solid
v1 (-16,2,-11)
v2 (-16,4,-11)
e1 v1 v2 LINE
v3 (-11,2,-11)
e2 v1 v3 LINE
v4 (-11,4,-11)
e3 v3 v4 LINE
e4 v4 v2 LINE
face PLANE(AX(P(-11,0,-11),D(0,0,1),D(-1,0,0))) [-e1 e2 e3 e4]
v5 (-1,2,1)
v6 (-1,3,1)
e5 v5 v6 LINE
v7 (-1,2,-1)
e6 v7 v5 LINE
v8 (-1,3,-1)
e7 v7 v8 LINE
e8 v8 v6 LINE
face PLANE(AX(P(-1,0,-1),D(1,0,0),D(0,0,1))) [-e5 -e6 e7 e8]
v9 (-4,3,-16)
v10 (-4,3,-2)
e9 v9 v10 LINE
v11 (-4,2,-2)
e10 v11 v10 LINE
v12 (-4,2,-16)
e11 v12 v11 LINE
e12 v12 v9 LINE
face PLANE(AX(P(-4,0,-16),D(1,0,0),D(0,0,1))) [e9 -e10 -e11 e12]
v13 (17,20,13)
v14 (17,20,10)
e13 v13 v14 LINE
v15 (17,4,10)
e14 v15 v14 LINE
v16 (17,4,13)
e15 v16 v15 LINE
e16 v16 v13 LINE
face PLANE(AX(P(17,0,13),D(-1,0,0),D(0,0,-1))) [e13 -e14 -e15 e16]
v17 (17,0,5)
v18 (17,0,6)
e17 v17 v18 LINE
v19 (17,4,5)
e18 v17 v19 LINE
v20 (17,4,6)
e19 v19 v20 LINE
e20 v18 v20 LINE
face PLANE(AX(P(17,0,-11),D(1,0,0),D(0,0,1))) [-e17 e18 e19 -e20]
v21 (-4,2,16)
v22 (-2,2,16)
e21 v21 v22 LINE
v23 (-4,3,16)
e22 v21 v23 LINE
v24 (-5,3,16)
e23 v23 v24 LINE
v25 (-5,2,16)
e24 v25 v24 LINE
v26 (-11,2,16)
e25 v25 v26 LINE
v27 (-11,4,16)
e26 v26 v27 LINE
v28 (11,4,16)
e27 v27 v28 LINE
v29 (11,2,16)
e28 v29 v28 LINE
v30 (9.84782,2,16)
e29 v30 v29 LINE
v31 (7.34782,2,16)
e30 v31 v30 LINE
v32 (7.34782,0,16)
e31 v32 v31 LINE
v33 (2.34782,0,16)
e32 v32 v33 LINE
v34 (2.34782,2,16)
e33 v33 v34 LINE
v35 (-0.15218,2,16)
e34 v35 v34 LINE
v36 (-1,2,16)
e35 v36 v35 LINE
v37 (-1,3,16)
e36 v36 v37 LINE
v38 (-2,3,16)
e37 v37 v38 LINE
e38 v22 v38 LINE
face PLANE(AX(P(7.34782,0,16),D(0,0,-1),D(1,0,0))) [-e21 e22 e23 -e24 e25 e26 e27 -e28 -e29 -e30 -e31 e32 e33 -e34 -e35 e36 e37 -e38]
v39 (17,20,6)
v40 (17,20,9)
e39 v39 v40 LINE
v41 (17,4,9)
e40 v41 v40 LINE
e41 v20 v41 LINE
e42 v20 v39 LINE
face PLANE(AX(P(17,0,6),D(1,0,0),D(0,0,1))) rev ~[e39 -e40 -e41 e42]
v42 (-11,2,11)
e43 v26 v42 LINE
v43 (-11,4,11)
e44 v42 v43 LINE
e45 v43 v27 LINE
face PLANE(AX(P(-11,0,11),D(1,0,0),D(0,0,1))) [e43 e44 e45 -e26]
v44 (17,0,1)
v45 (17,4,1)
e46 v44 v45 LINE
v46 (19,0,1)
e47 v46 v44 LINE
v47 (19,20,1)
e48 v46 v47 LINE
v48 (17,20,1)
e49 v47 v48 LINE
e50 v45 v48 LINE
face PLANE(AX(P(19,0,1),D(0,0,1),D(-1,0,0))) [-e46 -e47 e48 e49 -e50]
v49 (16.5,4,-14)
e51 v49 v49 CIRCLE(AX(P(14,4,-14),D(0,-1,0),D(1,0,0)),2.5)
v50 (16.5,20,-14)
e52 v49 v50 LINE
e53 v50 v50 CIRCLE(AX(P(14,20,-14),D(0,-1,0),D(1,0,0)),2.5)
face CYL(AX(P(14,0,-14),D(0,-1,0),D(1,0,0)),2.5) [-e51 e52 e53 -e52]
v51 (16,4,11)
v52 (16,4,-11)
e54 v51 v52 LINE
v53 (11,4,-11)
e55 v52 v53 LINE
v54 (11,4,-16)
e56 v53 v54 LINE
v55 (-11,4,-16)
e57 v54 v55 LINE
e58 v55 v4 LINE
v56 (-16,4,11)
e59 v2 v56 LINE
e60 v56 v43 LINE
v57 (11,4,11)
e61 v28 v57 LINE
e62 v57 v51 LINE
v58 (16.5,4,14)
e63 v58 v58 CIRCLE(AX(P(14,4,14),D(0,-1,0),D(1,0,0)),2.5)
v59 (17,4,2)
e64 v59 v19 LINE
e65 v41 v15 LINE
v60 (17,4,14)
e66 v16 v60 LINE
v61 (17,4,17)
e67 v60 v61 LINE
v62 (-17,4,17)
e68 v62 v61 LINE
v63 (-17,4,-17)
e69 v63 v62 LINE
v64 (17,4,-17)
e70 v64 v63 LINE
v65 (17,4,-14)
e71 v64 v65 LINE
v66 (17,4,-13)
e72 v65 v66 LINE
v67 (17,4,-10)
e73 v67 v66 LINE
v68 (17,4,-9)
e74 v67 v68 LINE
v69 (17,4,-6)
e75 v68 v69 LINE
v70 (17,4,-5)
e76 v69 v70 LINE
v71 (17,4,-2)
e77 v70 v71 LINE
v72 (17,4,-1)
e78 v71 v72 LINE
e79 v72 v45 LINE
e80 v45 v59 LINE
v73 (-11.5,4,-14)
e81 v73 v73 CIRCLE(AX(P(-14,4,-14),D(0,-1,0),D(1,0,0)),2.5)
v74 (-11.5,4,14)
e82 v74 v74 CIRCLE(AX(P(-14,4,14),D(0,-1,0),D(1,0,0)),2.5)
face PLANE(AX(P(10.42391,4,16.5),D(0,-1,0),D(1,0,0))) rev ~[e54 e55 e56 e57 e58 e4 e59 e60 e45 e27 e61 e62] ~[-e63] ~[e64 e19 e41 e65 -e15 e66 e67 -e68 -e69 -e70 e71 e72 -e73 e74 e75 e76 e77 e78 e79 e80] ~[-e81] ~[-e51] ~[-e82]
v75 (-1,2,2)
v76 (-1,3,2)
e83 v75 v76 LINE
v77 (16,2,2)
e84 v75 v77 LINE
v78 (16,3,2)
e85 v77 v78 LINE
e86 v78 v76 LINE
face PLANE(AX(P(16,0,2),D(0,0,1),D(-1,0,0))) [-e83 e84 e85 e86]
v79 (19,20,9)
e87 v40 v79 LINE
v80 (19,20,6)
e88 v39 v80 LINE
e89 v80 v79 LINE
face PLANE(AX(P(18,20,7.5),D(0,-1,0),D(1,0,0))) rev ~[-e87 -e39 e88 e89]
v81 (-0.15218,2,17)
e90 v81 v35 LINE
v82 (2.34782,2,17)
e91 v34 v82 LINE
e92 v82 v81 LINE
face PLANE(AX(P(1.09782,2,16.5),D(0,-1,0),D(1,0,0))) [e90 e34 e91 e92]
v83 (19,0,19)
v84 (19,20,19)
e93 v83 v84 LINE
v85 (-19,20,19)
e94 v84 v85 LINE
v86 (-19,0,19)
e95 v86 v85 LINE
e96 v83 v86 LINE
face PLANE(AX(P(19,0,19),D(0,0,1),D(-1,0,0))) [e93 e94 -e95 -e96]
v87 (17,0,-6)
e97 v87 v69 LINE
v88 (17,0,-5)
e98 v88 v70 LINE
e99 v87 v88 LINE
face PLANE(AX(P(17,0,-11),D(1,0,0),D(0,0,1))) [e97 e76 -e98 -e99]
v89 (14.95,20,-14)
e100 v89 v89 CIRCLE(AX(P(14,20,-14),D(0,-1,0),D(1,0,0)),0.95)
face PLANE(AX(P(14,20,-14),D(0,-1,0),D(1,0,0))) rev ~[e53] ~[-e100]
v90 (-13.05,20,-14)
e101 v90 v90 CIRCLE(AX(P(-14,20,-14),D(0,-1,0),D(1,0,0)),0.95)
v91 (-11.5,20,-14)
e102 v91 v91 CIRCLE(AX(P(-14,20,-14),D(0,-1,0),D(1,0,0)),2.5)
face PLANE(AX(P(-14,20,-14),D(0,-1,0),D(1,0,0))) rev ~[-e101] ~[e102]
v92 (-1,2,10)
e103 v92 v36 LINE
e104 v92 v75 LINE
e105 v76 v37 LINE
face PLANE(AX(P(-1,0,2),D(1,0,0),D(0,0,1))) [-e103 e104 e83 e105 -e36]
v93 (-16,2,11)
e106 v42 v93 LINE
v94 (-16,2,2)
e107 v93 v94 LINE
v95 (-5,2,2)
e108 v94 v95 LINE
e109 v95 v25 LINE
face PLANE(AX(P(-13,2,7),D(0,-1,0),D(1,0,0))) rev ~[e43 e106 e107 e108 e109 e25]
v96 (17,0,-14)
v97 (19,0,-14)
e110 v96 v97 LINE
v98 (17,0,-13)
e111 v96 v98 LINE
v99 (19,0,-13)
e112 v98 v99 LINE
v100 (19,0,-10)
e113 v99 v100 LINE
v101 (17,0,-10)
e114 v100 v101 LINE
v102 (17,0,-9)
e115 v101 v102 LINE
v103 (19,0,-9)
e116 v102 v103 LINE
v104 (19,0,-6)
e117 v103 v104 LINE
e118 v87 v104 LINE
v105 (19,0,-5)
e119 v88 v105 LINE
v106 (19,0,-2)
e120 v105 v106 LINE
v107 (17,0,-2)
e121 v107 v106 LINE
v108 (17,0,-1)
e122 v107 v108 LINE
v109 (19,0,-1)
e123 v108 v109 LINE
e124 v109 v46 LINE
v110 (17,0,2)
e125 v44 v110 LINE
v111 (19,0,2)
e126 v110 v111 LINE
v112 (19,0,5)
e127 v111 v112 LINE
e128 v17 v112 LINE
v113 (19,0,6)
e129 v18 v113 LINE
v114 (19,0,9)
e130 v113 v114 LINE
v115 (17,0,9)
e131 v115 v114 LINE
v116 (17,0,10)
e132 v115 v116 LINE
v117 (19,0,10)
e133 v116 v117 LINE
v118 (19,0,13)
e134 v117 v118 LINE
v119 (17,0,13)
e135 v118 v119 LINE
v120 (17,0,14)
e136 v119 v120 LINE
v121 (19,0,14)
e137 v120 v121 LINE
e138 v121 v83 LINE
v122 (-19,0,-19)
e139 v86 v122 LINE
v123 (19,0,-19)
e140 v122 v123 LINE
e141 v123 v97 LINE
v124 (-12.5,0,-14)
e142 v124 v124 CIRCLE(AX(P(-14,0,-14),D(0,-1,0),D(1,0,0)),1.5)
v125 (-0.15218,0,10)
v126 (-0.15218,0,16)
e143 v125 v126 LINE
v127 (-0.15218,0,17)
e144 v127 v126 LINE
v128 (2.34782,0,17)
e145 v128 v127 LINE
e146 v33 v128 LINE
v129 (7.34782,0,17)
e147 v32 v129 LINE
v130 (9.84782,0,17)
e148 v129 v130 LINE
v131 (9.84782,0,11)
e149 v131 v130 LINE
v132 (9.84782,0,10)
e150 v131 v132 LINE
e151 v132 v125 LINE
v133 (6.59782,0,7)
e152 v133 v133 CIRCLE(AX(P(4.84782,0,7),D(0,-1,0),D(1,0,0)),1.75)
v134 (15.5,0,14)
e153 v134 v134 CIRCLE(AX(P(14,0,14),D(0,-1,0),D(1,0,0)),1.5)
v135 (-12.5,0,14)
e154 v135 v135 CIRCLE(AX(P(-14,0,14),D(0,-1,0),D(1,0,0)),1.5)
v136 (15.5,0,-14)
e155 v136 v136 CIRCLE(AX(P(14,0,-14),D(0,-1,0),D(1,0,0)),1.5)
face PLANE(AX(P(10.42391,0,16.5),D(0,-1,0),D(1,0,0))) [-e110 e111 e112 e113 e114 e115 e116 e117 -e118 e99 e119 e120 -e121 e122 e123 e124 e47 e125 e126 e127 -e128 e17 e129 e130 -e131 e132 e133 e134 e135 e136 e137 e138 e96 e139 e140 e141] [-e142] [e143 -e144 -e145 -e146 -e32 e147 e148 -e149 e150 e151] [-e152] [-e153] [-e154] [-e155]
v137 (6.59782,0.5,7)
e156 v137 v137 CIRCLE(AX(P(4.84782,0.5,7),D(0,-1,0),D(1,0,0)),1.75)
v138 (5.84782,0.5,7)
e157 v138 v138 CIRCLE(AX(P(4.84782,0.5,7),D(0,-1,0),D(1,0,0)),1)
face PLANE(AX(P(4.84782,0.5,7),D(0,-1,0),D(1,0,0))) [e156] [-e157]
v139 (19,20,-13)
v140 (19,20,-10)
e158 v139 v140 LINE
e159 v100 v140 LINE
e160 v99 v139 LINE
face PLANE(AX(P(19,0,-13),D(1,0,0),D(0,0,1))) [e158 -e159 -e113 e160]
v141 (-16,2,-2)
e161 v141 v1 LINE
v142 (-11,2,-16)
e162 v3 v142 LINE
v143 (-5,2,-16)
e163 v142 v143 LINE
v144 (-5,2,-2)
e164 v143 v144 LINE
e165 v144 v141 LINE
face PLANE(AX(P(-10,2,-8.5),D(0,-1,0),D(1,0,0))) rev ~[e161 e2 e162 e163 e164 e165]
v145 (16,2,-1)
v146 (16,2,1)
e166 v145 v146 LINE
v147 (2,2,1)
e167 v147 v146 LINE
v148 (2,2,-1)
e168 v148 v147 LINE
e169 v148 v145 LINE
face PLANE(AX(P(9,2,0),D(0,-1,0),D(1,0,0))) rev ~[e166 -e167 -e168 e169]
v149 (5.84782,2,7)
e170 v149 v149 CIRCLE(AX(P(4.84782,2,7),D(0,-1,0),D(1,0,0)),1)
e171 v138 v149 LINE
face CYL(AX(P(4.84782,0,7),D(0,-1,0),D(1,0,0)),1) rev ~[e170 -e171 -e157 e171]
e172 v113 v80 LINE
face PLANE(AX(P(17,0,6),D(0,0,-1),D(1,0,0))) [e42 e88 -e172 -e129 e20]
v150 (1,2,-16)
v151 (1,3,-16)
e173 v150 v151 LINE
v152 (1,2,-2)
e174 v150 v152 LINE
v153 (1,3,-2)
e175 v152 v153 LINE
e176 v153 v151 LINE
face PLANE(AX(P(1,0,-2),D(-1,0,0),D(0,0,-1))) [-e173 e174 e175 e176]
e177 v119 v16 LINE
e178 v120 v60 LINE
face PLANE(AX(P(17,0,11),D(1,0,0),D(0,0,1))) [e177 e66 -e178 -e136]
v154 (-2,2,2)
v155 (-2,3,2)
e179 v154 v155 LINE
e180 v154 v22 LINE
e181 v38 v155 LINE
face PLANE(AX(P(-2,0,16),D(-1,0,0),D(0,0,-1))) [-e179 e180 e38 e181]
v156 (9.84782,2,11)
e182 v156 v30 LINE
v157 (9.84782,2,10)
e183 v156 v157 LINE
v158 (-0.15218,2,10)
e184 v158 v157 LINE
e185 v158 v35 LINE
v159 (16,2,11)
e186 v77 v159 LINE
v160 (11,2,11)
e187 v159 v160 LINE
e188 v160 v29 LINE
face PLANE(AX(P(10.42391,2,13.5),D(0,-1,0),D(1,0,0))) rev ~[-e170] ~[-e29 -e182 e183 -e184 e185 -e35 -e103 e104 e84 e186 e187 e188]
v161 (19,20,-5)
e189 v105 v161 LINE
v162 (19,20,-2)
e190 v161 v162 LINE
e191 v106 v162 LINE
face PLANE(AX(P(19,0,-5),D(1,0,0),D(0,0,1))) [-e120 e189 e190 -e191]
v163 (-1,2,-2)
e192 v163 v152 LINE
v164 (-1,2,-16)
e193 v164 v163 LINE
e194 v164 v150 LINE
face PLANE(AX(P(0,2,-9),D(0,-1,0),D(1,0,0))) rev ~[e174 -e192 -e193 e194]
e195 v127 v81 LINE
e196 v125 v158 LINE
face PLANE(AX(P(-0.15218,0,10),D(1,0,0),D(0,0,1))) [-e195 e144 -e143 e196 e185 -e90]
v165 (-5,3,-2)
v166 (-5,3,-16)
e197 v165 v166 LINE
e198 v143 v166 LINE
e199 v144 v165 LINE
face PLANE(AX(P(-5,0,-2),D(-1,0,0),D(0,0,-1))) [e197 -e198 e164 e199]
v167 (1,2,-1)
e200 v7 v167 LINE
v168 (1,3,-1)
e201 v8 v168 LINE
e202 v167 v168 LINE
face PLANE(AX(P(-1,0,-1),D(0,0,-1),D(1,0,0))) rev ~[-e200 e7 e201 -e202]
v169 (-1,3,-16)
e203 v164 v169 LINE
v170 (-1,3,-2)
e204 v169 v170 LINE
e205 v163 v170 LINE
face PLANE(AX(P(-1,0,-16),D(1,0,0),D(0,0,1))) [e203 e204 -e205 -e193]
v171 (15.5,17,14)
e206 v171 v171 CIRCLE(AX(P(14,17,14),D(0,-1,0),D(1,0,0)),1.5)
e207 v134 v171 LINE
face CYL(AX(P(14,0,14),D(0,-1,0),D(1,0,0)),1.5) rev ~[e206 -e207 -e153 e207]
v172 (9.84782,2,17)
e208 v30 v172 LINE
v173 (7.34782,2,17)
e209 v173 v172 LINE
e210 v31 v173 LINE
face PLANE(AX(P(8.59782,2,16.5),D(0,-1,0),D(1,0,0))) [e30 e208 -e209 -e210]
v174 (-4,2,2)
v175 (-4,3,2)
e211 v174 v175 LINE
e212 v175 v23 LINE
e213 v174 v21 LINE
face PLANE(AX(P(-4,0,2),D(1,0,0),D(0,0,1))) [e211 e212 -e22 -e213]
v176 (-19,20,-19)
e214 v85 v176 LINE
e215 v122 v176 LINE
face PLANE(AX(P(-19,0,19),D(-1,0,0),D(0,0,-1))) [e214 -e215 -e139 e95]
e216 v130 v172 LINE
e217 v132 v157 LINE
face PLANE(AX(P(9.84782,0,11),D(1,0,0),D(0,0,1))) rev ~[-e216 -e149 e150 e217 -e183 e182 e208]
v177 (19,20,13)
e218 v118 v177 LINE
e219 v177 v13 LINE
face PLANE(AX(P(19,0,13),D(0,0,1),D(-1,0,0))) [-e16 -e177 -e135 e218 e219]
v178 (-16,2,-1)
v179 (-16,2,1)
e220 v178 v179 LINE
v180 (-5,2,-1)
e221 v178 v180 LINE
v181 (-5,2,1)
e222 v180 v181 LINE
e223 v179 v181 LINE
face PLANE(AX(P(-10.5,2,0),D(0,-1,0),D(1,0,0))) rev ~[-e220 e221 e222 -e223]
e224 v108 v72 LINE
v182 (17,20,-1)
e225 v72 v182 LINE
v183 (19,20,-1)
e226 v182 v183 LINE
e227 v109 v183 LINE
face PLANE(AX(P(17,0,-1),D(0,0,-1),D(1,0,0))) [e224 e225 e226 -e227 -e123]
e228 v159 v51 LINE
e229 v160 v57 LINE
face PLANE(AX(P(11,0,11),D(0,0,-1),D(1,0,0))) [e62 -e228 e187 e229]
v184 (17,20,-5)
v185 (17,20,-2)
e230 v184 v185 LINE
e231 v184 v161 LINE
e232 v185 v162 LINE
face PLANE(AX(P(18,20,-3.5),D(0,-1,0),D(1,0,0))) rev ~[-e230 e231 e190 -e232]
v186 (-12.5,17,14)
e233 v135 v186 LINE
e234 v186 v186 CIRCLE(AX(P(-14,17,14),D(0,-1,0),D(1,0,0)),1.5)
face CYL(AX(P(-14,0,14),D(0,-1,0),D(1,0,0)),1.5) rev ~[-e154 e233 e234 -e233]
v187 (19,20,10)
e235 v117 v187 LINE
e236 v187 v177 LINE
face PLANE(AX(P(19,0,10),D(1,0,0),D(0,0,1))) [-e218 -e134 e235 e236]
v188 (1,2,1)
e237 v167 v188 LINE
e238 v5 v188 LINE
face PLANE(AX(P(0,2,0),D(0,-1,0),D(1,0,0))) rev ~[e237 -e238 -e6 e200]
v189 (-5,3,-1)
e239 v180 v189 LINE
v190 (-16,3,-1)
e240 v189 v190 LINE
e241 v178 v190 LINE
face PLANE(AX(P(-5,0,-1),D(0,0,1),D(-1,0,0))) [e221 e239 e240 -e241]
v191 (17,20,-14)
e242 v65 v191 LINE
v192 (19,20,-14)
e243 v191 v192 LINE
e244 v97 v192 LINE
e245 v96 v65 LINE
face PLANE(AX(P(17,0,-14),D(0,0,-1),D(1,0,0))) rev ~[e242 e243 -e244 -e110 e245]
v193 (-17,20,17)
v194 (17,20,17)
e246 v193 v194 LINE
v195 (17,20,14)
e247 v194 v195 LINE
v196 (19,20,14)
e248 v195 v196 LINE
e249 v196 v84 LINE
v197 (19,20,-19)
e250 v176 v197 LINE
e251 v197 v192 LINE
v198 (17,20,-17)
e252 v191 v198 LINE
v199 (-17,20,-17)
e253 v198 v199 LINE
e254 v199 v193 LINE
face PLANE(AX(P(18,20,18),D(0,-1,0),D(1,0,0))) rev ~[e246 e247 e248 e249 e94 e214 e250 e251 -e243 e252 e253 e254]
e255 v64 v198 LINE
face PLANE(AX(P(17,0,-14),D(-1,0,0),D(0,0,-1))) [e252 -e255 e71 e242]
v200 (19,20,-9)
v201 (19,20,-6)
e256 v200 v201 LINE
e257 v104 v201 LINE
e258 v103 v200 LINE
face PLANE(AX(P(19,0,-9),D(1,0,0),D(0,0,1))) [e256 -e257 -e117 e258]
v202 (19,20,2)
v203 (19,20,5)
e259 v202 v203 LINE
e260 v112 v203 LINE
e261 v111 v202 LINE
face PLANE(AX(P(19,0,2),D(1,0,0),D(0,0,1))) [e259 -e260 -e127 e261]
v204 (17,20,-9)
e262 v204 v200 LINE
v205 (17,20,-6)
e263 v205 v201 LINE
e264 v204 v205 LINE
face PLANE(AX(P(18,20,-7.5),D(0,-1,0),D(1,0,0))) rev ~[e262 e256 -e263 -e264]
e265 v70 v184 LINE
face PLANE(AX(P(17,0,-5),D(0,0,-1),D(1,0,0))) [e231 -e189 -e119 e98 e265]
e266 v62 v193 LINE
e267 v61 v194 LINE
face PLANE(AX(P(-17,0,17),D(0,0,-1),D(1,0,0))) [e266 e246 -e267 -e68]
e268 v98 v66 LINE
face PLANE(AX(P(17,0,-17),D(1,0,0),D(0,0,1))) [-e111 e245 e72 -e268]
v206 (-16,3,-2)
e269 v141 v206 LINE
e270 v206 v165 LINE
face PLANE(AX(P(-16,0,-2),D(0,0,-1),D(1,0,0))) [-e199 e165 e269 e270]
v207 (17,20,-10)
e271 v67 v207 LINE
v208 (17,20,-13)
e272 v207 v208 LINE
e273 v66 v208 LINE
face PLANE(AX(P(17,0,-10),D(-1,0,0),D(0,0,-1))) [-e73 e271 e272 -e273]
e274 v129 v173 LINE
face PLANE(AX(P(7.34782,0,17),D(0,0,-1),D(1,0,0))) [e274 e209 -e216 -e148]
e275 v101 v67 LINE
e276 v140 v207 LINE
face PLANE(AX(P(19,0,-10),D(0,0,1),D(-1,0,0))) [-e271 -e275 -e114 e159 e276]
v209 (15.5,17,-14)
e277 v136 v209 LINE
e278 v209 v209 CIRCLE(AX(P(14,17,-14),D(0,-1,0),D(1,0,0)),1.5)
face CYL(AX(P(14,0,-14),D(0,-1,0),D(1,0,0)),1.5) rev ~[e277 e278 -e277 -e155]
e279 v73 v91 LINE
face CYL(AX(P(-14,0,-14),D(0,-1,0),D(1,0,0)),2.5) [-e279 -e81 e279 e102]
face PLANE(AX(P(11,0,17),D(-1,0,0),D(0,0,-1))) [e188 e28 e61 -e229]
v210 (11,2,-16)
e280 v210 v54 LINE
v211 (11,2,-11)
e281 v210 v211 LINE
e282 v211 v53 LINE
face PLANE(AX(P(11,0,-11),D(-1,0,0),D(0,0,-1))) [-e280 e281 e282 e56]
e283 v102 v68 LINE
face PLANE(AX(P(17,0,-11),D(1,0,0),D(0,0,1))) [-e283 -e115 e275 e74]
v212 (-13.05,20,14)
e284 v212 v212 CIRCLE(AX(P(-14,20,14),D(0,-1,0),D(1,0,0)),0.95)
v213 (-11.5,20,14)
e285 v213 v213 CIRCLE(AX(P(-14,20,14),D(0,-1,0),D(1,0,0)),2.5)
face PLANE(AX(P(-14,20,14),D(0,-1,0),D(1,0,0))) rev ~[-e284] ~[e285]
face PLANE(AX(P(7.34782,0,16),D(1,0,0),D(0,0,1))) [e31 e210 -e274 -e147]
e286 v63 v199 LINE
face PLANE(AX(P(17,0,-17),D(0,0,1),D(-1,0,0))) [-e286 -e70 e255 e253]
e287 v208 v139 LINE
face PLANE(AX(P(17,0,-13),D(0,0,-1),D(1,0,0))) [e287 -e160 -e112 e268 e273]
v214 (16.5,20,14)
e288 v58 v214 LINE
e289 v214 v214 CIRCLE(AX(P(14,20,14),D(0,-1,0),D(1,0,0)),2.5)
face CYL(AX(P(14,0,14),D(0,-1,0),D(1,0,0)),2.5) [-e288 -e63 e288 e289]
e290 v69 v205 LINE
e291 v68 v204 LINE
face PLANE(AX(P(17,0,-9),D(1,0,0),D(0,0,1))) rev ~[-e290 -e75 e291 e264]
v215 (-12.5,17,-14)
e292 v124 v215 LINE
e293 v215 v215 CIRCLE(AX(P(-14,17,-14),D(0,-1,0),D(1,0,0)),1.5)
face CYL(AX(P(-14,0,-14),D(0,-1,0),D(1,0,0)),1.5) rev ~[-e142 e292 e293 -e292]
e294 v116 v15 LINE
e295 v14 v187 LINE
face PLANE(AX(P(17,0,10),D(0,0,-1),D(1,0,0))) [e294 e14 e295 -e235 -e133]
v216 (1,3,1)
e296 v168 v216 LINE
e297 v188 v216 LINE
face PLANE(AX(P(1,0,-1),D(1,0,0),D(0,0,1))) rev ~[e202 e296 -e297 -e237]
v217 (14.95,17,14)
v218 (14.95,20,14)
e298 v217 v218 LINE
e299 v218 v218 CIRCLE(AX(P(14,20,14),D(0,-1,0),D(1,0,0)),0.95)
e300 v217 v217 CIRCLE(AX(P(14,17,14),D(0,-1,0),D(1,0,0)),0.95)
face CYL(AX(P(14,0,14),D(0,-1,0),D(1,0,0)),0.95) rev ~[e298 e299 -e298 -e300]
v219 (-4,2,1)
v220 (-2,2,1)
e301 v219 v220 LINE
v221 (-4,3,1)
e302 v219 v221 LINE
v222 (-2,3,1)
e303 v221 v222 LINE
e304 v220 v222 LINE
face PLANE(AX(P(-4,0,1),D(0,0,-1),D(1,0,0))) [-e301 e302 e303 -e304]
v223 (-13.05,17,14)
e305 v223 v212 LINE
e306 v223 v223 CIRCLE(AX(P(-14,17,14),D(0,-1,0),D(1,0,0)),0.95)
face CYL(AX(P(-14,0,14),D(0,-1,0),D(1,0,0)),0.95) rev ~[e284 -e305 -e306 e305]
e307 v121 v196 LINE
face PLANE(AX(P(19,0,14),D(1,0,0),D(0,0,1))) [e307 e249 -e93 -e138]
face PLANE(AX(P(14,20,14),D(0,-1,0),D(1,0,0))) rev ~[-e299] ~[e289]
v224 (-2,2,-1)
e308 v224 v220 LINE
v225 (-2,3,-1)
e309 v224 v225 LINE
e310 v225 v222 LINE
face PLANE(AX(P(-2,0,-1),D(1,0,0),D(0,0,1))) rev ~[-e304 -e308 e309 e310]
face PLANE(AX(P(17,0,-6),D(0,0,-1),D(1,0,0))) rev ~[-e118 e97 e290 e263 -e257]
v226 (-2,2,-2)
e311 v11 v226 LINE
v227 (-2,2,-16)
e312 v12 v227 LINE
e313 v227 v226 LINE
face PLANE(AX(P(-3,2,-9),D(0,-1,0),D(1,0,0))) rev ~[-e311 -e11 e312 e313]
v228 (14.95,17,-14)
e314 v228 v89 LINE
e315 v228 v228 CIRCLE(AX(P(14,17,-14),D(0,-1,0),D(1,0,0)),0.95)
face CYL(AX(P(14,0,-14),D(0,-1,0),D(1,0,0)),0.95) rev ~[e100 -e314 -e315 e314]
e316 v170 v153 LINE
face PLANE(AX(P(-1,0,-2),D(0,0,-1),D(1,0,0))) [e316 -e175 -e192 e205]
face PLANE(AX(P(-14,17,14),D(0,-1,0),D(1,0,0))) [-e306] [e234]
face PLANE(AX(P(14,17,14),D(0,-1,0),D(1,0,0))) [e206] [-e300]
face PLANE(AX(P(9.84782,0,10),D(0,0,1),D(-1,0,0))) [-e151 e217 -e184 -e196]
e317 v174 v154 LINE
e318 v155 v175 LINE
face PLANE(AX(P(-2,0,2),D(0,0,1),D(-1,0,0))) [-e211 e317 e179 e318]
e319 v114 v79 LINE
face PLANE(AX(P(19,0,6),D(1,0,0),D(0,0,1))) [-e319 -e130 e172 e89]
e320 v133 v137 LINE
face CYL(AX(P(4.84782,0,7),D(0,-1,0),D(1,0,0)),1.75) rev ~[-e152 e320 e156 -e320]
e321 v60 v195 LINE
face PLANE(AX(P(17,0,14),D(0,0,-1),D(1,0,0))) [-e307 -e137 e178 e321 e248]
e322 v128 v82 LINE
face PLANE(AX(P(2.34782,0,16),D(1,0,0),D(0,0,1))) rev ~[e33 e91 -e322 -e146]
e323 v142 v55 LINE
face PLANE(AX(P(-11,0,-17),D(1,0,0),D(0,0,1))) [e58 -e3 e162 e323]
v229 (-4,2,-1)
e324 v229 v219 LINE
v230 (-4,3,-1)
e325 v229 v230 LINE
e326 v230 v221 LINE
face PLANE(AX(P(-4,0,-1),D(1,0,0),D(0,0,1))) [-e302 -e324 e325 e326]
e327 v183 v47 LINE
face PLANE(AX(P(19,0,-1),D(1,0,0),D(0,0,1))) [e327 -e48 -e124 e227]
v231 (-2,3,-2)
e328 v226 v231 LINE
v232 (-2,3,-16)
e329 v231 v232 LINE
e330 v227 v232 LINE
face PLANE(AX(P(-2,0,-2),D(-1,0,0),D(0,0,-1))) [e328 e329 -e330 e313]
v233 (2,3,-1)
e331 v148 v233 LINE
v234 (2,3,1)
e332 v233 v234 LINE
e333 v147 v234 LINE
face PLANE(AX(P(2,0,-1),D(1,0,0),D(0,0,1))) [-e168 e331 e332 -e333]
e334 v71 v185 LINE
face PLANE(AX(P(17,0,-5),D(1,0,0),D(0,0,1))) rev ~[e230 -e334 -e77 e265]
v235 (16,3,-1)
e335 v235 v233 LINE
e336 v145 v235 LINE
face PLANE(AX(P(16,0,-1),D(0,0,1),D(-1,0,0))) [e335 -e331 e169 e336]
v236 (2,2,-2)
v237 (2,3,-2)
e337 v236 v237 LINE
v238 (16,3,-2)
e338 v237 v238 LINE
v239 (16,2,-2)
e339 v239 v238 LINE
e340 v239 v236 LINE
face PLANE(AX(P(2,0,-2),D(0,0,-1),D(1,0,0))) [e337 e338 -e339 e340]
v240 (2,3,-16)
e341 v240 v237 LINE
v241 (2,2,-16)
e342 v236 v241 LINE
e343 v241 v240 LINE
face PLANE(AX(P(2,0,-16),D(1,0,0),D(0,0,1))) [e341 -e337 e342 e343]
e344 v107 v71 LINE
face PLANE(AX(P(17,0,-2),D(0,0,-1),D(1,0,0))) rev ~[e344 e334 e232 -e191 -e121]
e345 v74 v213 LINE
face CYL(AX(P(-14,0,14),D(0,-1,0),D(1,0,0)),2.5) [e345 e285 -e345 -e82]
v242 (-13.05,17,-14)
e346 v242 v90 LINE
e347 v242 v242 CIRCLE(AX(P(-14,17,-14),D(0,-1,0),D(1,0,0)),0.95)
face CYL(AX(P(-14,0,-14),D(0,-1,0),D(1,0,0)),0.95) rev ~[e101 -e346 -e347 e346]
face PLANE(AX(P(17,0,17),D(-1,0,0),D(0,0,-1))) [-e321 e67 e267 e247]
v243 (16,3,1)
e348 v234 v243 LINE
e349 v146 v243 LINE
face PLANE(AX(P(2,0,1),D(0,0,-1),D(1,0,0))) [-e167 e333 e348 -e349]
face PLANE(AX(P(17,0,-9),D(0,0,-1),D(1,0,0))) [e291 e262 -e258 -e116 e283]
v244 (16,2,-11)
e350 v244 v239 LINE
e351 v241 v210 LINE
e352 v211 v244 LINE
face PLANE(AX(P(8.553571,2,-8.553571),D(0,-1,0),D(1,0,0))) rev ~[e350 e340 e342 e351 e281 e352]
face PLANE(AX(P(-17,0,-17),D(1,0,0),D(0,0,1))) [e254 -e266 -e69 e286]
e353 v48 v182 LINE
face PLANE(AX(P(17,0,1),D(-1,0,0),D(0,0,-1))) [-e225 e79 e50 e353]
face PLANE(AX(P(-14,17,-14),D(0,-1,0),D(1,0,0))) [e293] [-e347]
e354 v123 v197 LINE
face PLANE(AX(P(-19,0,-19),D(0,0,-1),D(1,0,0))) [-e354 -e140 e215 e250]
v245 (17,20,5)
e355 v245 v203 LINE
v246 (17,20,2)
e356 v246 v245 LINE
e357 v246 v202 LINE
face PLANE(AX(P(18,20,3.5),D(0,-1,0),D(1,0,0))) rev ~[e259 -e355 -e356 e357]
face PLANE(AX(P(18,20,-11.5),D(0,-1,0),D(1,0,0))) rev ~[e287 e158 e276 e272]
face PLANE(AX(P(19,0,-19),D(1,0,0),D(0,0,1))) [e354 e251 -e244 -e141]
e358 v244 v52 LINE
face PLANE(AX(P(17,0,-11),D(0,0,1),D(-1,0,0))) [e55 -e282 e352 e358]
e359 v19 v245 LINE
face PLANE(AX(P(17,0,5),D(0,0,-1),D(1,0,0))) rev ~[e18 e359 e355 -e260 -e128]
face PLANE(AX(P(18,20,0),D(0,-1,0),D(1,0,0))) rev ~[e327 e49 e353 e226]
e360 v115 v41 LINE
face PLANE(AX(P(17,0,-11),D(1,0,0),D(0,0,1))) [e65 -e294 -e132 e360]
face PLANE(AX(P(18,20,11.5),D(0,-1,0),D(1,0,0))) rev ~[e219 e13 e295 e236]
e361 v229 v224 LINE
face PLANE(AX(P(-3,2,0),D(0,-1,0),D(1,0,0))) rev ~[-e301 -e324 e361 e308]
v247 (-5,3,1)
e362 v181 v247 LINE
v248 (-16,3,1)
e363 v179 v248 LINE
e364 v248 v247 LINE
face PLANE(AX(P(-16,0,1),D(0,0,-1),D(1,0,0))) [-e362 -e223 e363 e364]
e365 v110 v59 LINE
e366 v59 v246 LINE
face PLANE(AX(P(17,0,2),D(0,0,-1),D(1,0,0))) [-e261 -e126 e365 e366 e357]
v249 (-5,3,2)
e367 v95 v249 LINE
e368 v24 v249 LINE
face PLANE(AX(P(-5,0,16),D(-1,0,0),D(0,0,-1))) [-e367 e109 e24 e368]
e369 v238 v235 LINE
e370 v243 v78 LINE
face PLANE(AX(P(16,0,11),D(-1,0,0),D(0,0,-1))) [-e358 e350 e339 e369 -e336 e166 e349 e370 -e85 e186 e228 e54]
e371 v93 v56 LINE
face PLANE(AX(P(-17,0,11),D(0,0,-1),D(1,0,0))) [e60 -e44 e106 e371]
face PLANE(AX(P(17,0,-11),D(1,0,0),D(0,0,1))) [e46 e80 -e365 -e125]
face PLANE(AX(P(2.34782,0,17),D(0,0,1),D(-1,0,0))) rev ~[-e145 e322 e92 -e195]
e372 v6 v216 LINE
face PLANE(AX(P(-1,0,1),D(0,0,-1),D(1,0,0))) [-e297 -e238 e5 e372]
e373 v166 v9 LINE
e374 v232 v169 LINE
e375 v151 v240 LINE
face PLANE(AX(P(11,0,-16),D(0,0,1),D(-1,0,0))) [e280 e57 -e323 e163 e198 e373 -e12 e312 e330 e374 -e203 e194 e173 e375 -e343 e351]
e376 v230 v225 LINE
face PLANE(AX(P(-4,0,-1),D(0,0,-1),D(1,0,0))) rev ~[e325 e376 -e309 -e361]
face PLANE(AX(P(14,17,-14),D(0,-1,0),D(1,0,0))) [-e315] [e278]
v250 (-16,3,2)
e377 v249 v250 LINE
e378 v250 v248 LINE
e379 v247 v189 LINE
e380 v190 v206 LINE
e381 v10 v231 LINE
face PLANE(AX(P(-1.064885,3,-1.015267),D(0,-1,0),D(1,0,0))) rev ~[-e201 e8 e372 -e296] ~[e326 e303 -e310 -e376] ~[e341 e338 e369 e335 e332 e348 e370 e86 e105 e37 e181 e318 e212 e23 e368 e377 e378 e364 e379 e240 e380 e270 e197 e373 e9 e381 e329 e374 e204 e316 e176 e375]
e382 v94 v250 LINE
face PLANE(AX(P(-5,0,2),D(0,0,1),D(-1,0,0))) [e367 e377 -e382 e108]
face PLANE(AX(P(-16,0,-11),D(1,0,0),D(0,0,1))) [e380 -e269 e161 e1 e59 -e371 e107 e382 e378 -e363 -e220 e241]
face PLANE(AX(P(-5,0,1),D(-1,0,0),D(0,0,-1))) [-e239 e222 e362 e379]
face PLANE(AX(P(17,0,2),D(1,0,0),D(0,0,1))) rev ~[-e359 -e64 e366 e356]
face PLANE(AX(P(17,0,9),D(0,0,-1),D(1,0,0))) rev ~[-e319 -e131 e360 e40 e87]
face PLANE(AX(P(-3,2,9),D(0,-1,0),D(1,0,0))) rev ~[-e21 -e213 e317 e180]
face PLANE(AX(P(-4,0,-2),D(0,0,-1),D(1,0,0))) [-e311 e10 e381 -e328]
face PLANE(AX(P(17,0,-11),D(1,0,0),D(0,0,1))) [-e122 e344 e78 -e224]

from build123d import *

# Parameters (mm, degrees)
F0_W      = 2
F0_H      = 2
F1_DEPTH  = 3
F0_H_2    = 14
F0_W_2    = 14
F0_W_3    = 11
F2_DEPTH  = 2
F0_R      = 2.5
F3_DEPTH  = 4
F0_R_2    = 1.5
F0_R_3    = 0.95
F4_DEPTH  = 20
F5_DEPTH  = 17
F6_DEPTH  = 17
F7_DEPTH  = 17
F8_DEPTH  = 17
F0_W_4    = 6
F0_H_3    = 6
F9_DEPTH  = 2
F0_H_4    = 3
F10_DEPTH = 20
F0_W_5    = 3
F0_W_6    = 5
F0_W_7    = 1.1521804929
F0_H_5    = 5
F0_R_4    = 1.75
F0_R_5    = 1
F0_W_8    = 0.8478195071
F11_DEPTH = 2
F0_H_6    = 1
F12_DEPTH = 4
F0_W_9    = 2.5
F13_DEPTH = 4
F14_DEPTH = 2
F15_DEPTH = 2
F16_DEPTH = 0.5


# Not quite as in the source:
# - a feature names something its author has since deleted; it is built from what else it names


with BuildPart() as f1:
    # F0 (on Front) → F1 (new body)
    with BuildSketch(Plane.XZ):
        Polygon((16, 1), (16, 2), (2, 2), (1, 2), (-1, 2), (-1, 10), (-1, 16), (-2, 16), (-2, 2), (-4, 2), (-4, 16), (-5, 16), (-5, 2), (-16, 2), (-16, 1), (-5, 1), (-5, -1), (-16, -1), (-16, -2), (-5, -2), (-5, -16), (-4, -16), (-4, -2), (-2, -2), (-2, -16), (-1, -16), (-1, -2), (1, -2), (1, -16), (2, -16), (2, -2), (16, -2), (16, -1), (2, -1), (2, 1), align=None)
        with Locations((-3, 0)):
            Rectangle(F0_W, F0_H, mode=Mode.SUBTRACT)
        Rectangle(F0_W, F0_H, mode=Mode.SUBTRACT)
    extrude(amount=-F1_DEPTH)

    # F0 (on Front) → F2 (join)
    with BuildSketch(Plane.XZ):
        Polygon((16, 2), (16, 10.1685791543), (16, 11), (11, 11), (9.8478195071, 11), (9.8478195071, 10.2023985237), (9.8478195071, 10), (7.6956390142, 10), (7.6956390142, 7.9433578615), (7.6956390142, 6.0566421385), (7.6956390142, 4), (4.8478195071, 4), (2, 4), (2, 6.0566421385), (2, 7.9433578615), (2, 10), (-0.1521804929, 10), (-1, 10), (-1, 2), (1, 2), (2, 2), align=None)
        with Locations((-3, 9)):
            Rectangle(F0_W, F0_H_2)
        Polygon((16, -11), (16, -2), (2, -2), (2, -16), (11, -16), (11, -11), align=None)
        with Locations((9, 0)):
            Rectangle(F0_W_2, F0_H)
        with Locations((-10.5, 0)):
            Rectangle(F0_W_3, F0_H)
        Polygon((-11, -11), (-11, -16), (-5, -16), (-5, -2), (-16, -2), (-16, -11), align=None)
        with Locations((-3, -9)):
            Rectangle(F0_W, F0_H_2)
        with Locations((0, -9)):
            Rectangle(F0_W, F0_H_2)
        Polygon((-5, 2), (-5, 16), (-11, 16), (-11, 11), (-16, 11), (-16, 10), (-10, 10), (-10, 4), (-16, 4), (-16, 2), align=None)
        with Locations((-3, 0)):
            Rectangle(F0_W, F0_H)
        Rectangle(F0_W, F0_H)
    extrude(amount=-F2_DEPTH)

    # F0 (on Front) → F3 (join)
    with BuildSketch(Plane.XZ):
        Polygon((11, 11), (16, 11), (17, 11), (17, 13), (17, 14), (17, 17), (14, 17), (11, 17), (11, 16), align=None)
        with Locations((14, 14)):
            Circle(F0_R, mode=Mode.SUBTRACT)
        Polygon((-11, 16), (-11, 17), (-14, 17), (-17, 17), (-17, 14), (-17, 11), (-16, 11), (-11, 11), align=None)
        with Locations((-14, 14)):
            Circle(F0_R, mode=Mode.SUBTRACT)
        Polygon((-14, -17), (-11, -17), (-11, -16), (-11, -11), (-16, -11), (-17, -11), (-17, -14), (-17, -17), align=None)
        with Locations((-14, -14)):
            Circle(F0_R, mode=Mode.SUBTRACT)
        Polygon((17, -11), (16, -11), (11, -11), (11, -16), (11, -17), (14, -17), (17, -17), (17, -14), (17, -13), align=None)
        with Locations((14, -14)):
            Circle(F0_R, mode=Mode.SUBTRACT)
    extrude(amount=-F3_DEPTH)

    # F0 (on Front) → F4 (join)
    with BuildSketch(Plane.XZ):
        with Locations((14, 14)):
            Circle(F0_R)
        with Locations((14, 14)):
            Circle(F0_R_2, mode=Mode.SUBTRACT)
        with Locations((14, 14)):
            Circle(F0_R_2)
        with Locations((14, 14)):
            Circle(F0_R_3, mode=Mode.SUBTRACT)
        with Locations((-14, 14)):
            Circle(F0_R)
        with Locations((-14, 14)):
            Circle(F0_R_2, mode=Mode.SUBTRACT)
        with Locations((-14, 14)):
            Circle(F0_R_2)
        with Locations((-14, 14)):
            Circle(F0_R_3, mode=Mode.SUBTRACT)
        with Locations((-14, -14)):
            Circle(F0_R)
        with Locations((-14, -14)):
            Circle(F0_R_2, mode=Mode.SUBTRACT)
        with Locations((-14, -14)):
            Circle(F0_R_2)
        with Locations((-14, -14)):
            Circle(F0_R_3, mode=Mode.SUBTRACT)
        with Locations((14, -14)):
            Circle(F0_R)
        with Locations((14, -14)):
            Circle(F0_R_2, mode=Mode.SUBTRACT)
        with Locations((14, -14)):
            Circle(F0_R_2)
        with Locations((14, -14)):
            Circle(F0_R_3, mode=Mode.SUBTRACT)
    extrude(amount=-F4_DEPTH)

    # F0 (on Front) → F5 (cut)
    with BuildSketch(Plane.XZ):
        with Locations((-14, 14)):
            Circle(F0_R_2)
        with Locations((-14, 14)):
            Circle(F0_R_3, mode=Mode.SUBTRACT)
    extrude(amount=-F5_DEPTH, mode=Mode.SUBTRACT)

    # F0 (on Front) → F6 (cut)
    with BuildSketch(Plane.XZ):
        with Locations((14, 14)):
            Circle(F0_R_2)
        with Locations((14, 14)):
            Circle(F0_R_3, mode=Mode.SUBTRACT)
    extrude(amount=-F6_DEPTH, mode=Mode.SUBTRACT)

    # F0 (on Front) → F7 (cut)
    with BuildSketch(Plane.XZ):
        with Locations((-14, -14)):
            Circle(F0_R_2)
        with Locations((-14, -14)):
            Circle(F0_R_3, mode=Mode.SUBTRACT)
    extrude(amount=-F7_DEPTH, mode=Mode.SUBTRACT)

    # F0 (on Front) → F8 (cut)
    with BuildSketch(Plane.XZ):
        with Locations((14, -14)):
            Circle(F0_R_2)
        with Locations((14, -14)):
            Circle(F0_R_3, mode=Mode.SUBTRACT)
    extrude(amount=-F8_DEPTH, mode=Mode.SUBTRACT)

    # F0 (on Front) → F9 (join)
    with BuildSketch(Plane.XZ):
        with Locations((-13, 7)):
            Rectangle(F0_W_4, F0_H_3)
    extrude(amount=-F9_DEPTH)

    # F0 (on Front) → F10, piece 6 (join)
    with BuildSketch(Plane.XZ):
        with Locations((18, 18)):
            Rectangle(F0_W, F0_H)
        with Locations((18, 15.5)):
            Rectangle(F0_W, F0_H_4)
        with Locations((15.5, 18)):
            Rectangle(F0_W_5, F0_H)
        Polygon((9.8478195071, 17), (11, 17), (14, 17), (14, 19), (7.3478195071, 19), (7.3478195071, 17), align=None)
        with Locations((4.8478195071, 18)):
            Rectangle(F0_W_6, F0_H)
        Polygon((-0.1521804929, 17), (2.3478195071, 17), (2.3478195071, 19), (-14, 19), (-14, 17), (-11, 17), align=None)
        with Locations((-15.5, 18)):
            Rectangle(F0_W_5, F0_H)
        with Locations((-18, 18)):
            Rectangle(F0_W, F0_H)
        with Locations((-18, 15.5)):
            Rectangle(F0_W, F0_H_4)
        Polygon((-19, -14), (-17, -14), (-17, -11), (-17, -2), (-17, -1), (-17, 1), (-17, 2), (-17, 11), (-17, 14), (-19, 14), align=None)
        Polygon((17, 13), (17, 11), (17, 10), (19, 10), (19, 13), align=None)
        Polygon((17, -10), (17, -11), (17, -13), (19, -13), (19, -10), align=None)
        with Locations((18, -15.5)):
            Rectangle(F0_W, F0_H_4)
        with Locations((18, -18)):
            Rectangle(F0_W, F0_H)
        with Locations((15.5, -18)):
            Rectangle(F0_W_5, F0_H)
        Polygon((14, -17), (11, -17), (-11, -17), (-14, -17), (-14, -19), (14, -19), align=None)
        with Locations((-15.5, -18)):
            Rectangle(F0_W_5, F0_H)
        with Locations((-18, -18)):
            Rectangle(F0_W, F0_H)
        with Locations((-18, -15.5)):
            Rectangle(F0_W, F0_H_4)
    extrude(amount=-F10_DEPTH)

    # F0 (on Front) → F11 (join)
    with BuildSketch(Plane.XZ):
        with Locations((10.4239097536, 13.5)):
            Rectangle(F0_W_7, F0_H_5)
        with BuildLine():
            Line((7.6956390142, 7.9433578615), (7.6956390142, 10))
            Line((7.6956390142, 10), (4.8478195071, 10))
            ThreePointArc((4.8478195071, 10), (6.6042258404, 9.4320848653), (7.6956390142, 7.9433578615))
        make_face()
        with BuildLine():
            ThreePointArc((7.6956390142, 7.9433578615), (6.6042258404, 9.4320848653), (4.8478195071, 10))
            ThreePointArc((4.8478195071, 10), (3.0914131738, 9.4320848653), (2, 7.9433578615))
            Line((2, 7.9433578615), (2, 6.0566421385))
            ThreePointArc((2, 6.0566421385), (3.0914131738, 4.5679151347), (4.8478195071, 4))
            ThreePointArc((4.8478195071, 4), (6.6042258404, 4.5679151347), (7.6956390142, 6.0566421385))
            Line((7.6956390142, 6.0566421385), (7.6956390142, 7.9433578615))
        make_face()
        with Locations((4.8478195071, 7)):
            Circle(F0_R_4, mode=Mode.SUBTRACT)
        with BuildLine():
            Line((7.6956390142, 4), (7.6956390142, 6.0566421385))
            ThreePointArc((7.6956390142, 6.0566421385), (6.6042258404, 4.5679151347), (4.8478195071, 4))
            Line((4.8478195071, 4), (7.6956390142, 4))
        make_face()
        with Locations((4.8478195071, 7)):
            Circle(F0_R_4)
        with Locations((4.8478195071, 7)):
            Circle(F0_R_5, mode=Mode.SUBTRACT)
        with BuildLine():
            ThreePointArc((4.8478195071, 4), (3.0914131738, 4.5679151347), (2, 6.0566421385))
            Line((2, 6.0566421385), (2, 4))
            Line((2, 4), (4.8478195071, 4))
        make_face()
        with BuildLine():
            Line((4.8478195071, 10), (2, 10))
            Line((2, 10), (2, 7.9433578615))
            ThreePointArc((2, 7.9433578615), (3.0914131738, 9.4320848653), (4.8478195071, 10))
        make_face()
        with Locations((-0.5760902464, 13)):
            Rectangle(F0_W_8, F0_H_3)
    extrude(amount=-F11_DEPTH)



with BuildPart() as f10:
    # F0 (on Front) → F10 (new body)
    with BuildSketch(Plane.XZ):
        with Locations((18, 7.5)):
            Rectangle(F0_W, F0_H_4)
    extrude(amount=-F10_DEPTH)


with BuildPart() as f10b:
    # F0 (on Front) → F10, piece 2 (new body)
    with BuildSketch(Plane.XZ):
        with Locations((18, 3.5)):
            Rectangle(F0_W, F0_H_4)
    extrude(amount=-F10_DEPTH)


with BuildPart() as f10c:
    # F0 (on Front) → F10, piece 3 (new body)
    with BuildSketch(Plane.XZ):
        Polygon((19, 1), (17, 1), (17, 0), (17, -1), (19, -1), (19, 0), align=None)
    extrude(amount=-F10_DEPTH)


with BuildPart() as f10d:
    # F0 (on Front) → F10, piece 4 (new body)
    with BuildSketch(Plane.XZ):
        with Locations((18, -3.5)):
            Rectangle(F0_W, F0_H_4)
    extrude(amount=-F10_DEPTH)


with BuildPart() as f10e:
    # F0 (on Front) → F10, piece 5 (new body)
    with BuildSketch(Plane.XZ):
        with Locations((18, -7.5)):
            Rectangle(F0_W, F0_H_4)
    extrude(amount=-F10_DEPTH)


with BuildPart() as f1_1:
    add(f1.part)

    add(f10.part)  # F12 merges F10

    add(f10b.part)  # F12 merges F10b

    add(f10c.part)  # F12 merges F10c

    add(f10d.part)  # F12 merges F10d

    add(f10e.part)  # F12 merges F10e
    # F0 (on Front) → F12 (join)
    with BuildSketch(Plane.XZ):
        Polygon((16, 11), (16, 10.1685791543), (16, 2), (16, 1), (16, -1), (16, -2), (16, -11), (17, -11), (17, -10), (17, -9), (17, -6), (17, -5), (17, -2), (17, -1), (17, 0), (17, 1), (17, 2), (17, 5), (17, 6), (17, 9), (17, 10), (17, 11), align=None)
        with Locations((4.8478195071, 16.5)):
            Rectangle(F0_W_6, F0_H_6)
        Polygon((11, -16), (2, -16), (1, -16), (-1, -16), (-2, -16), (-4, -16), (-5, -16), (-11, -16), (-11, -17), (11, -17), align=None)
        Polygon((-2, 16), (-1, 16), (-0.1521804929, 16), (-0.1521804929, 17), (-11, 17), (-11, 16), (-5, 16), (-4, 16), align=None)
        Polygon((-16, 1), (-16, 2), (-16, 4), (-16, 10), (-16, 11), (-17, 11), (-17, 2), (-17, 1), (-17, -1), (-17, -2), (-17, -11), (-16, -11), (-16, -2), (-16, -1), align=None)
    extrude(amount=-F12_DEPTH)

    # F0 (on Front) → F13 (join)
    with BuildSketch(Plane.XZ):
        with Locations((10.4239097536, 16.5)):
            Rectangle(F0_W_7, F0_H_6)
        with Locations((8.5978195071, 16.5)):
            Rectangle(F0_W_9, F0_H_6)
        Polygon((2, 16), (2.3478195071, 16), (2.3478195071, 17), (-0.1521804929, 17), (-0.1521804929, 16), (1, 16), align=None)
    extrude(amount=-F13_DEPTH)

    # F0 (on Front) → F14 (cut)
    with BuildSketch(Plane.XZ):
        Polygon((2, 16), (2.3478195071, 16), (2.3478195071, 17), (-0.1521804929, 17), (-0.1521804929, 16), (1, 16), align=None)
    extrude(amount=-F14_DEPTH, mode=Mode.SUBTRACT)

    # F0 (on Front) → F15 (cut)
    with BuildSketch(Plane.XZ):
        with Locations((8.5978195071, 16.5)):
            Rectangle(F0_W_9, F0_H_6)
    extrude(amount=-F15_DEPTH, mode=Mode.SUBTRACT)

    # F0 (on Front) → F16 (cut)
    with BuildSketch(Plane.XZ):
        with Locations((4.8478195071, 7)):
            Circle(F0_R_4)
        with Locations((4.8478195071, 7)):
            Circle(F0_R_5, mode=Mode.SUBTRACT)
    extrude(amount=-F16_DEPTH, mode=Mode.SUBTRACT)


solid = f1_1.part
